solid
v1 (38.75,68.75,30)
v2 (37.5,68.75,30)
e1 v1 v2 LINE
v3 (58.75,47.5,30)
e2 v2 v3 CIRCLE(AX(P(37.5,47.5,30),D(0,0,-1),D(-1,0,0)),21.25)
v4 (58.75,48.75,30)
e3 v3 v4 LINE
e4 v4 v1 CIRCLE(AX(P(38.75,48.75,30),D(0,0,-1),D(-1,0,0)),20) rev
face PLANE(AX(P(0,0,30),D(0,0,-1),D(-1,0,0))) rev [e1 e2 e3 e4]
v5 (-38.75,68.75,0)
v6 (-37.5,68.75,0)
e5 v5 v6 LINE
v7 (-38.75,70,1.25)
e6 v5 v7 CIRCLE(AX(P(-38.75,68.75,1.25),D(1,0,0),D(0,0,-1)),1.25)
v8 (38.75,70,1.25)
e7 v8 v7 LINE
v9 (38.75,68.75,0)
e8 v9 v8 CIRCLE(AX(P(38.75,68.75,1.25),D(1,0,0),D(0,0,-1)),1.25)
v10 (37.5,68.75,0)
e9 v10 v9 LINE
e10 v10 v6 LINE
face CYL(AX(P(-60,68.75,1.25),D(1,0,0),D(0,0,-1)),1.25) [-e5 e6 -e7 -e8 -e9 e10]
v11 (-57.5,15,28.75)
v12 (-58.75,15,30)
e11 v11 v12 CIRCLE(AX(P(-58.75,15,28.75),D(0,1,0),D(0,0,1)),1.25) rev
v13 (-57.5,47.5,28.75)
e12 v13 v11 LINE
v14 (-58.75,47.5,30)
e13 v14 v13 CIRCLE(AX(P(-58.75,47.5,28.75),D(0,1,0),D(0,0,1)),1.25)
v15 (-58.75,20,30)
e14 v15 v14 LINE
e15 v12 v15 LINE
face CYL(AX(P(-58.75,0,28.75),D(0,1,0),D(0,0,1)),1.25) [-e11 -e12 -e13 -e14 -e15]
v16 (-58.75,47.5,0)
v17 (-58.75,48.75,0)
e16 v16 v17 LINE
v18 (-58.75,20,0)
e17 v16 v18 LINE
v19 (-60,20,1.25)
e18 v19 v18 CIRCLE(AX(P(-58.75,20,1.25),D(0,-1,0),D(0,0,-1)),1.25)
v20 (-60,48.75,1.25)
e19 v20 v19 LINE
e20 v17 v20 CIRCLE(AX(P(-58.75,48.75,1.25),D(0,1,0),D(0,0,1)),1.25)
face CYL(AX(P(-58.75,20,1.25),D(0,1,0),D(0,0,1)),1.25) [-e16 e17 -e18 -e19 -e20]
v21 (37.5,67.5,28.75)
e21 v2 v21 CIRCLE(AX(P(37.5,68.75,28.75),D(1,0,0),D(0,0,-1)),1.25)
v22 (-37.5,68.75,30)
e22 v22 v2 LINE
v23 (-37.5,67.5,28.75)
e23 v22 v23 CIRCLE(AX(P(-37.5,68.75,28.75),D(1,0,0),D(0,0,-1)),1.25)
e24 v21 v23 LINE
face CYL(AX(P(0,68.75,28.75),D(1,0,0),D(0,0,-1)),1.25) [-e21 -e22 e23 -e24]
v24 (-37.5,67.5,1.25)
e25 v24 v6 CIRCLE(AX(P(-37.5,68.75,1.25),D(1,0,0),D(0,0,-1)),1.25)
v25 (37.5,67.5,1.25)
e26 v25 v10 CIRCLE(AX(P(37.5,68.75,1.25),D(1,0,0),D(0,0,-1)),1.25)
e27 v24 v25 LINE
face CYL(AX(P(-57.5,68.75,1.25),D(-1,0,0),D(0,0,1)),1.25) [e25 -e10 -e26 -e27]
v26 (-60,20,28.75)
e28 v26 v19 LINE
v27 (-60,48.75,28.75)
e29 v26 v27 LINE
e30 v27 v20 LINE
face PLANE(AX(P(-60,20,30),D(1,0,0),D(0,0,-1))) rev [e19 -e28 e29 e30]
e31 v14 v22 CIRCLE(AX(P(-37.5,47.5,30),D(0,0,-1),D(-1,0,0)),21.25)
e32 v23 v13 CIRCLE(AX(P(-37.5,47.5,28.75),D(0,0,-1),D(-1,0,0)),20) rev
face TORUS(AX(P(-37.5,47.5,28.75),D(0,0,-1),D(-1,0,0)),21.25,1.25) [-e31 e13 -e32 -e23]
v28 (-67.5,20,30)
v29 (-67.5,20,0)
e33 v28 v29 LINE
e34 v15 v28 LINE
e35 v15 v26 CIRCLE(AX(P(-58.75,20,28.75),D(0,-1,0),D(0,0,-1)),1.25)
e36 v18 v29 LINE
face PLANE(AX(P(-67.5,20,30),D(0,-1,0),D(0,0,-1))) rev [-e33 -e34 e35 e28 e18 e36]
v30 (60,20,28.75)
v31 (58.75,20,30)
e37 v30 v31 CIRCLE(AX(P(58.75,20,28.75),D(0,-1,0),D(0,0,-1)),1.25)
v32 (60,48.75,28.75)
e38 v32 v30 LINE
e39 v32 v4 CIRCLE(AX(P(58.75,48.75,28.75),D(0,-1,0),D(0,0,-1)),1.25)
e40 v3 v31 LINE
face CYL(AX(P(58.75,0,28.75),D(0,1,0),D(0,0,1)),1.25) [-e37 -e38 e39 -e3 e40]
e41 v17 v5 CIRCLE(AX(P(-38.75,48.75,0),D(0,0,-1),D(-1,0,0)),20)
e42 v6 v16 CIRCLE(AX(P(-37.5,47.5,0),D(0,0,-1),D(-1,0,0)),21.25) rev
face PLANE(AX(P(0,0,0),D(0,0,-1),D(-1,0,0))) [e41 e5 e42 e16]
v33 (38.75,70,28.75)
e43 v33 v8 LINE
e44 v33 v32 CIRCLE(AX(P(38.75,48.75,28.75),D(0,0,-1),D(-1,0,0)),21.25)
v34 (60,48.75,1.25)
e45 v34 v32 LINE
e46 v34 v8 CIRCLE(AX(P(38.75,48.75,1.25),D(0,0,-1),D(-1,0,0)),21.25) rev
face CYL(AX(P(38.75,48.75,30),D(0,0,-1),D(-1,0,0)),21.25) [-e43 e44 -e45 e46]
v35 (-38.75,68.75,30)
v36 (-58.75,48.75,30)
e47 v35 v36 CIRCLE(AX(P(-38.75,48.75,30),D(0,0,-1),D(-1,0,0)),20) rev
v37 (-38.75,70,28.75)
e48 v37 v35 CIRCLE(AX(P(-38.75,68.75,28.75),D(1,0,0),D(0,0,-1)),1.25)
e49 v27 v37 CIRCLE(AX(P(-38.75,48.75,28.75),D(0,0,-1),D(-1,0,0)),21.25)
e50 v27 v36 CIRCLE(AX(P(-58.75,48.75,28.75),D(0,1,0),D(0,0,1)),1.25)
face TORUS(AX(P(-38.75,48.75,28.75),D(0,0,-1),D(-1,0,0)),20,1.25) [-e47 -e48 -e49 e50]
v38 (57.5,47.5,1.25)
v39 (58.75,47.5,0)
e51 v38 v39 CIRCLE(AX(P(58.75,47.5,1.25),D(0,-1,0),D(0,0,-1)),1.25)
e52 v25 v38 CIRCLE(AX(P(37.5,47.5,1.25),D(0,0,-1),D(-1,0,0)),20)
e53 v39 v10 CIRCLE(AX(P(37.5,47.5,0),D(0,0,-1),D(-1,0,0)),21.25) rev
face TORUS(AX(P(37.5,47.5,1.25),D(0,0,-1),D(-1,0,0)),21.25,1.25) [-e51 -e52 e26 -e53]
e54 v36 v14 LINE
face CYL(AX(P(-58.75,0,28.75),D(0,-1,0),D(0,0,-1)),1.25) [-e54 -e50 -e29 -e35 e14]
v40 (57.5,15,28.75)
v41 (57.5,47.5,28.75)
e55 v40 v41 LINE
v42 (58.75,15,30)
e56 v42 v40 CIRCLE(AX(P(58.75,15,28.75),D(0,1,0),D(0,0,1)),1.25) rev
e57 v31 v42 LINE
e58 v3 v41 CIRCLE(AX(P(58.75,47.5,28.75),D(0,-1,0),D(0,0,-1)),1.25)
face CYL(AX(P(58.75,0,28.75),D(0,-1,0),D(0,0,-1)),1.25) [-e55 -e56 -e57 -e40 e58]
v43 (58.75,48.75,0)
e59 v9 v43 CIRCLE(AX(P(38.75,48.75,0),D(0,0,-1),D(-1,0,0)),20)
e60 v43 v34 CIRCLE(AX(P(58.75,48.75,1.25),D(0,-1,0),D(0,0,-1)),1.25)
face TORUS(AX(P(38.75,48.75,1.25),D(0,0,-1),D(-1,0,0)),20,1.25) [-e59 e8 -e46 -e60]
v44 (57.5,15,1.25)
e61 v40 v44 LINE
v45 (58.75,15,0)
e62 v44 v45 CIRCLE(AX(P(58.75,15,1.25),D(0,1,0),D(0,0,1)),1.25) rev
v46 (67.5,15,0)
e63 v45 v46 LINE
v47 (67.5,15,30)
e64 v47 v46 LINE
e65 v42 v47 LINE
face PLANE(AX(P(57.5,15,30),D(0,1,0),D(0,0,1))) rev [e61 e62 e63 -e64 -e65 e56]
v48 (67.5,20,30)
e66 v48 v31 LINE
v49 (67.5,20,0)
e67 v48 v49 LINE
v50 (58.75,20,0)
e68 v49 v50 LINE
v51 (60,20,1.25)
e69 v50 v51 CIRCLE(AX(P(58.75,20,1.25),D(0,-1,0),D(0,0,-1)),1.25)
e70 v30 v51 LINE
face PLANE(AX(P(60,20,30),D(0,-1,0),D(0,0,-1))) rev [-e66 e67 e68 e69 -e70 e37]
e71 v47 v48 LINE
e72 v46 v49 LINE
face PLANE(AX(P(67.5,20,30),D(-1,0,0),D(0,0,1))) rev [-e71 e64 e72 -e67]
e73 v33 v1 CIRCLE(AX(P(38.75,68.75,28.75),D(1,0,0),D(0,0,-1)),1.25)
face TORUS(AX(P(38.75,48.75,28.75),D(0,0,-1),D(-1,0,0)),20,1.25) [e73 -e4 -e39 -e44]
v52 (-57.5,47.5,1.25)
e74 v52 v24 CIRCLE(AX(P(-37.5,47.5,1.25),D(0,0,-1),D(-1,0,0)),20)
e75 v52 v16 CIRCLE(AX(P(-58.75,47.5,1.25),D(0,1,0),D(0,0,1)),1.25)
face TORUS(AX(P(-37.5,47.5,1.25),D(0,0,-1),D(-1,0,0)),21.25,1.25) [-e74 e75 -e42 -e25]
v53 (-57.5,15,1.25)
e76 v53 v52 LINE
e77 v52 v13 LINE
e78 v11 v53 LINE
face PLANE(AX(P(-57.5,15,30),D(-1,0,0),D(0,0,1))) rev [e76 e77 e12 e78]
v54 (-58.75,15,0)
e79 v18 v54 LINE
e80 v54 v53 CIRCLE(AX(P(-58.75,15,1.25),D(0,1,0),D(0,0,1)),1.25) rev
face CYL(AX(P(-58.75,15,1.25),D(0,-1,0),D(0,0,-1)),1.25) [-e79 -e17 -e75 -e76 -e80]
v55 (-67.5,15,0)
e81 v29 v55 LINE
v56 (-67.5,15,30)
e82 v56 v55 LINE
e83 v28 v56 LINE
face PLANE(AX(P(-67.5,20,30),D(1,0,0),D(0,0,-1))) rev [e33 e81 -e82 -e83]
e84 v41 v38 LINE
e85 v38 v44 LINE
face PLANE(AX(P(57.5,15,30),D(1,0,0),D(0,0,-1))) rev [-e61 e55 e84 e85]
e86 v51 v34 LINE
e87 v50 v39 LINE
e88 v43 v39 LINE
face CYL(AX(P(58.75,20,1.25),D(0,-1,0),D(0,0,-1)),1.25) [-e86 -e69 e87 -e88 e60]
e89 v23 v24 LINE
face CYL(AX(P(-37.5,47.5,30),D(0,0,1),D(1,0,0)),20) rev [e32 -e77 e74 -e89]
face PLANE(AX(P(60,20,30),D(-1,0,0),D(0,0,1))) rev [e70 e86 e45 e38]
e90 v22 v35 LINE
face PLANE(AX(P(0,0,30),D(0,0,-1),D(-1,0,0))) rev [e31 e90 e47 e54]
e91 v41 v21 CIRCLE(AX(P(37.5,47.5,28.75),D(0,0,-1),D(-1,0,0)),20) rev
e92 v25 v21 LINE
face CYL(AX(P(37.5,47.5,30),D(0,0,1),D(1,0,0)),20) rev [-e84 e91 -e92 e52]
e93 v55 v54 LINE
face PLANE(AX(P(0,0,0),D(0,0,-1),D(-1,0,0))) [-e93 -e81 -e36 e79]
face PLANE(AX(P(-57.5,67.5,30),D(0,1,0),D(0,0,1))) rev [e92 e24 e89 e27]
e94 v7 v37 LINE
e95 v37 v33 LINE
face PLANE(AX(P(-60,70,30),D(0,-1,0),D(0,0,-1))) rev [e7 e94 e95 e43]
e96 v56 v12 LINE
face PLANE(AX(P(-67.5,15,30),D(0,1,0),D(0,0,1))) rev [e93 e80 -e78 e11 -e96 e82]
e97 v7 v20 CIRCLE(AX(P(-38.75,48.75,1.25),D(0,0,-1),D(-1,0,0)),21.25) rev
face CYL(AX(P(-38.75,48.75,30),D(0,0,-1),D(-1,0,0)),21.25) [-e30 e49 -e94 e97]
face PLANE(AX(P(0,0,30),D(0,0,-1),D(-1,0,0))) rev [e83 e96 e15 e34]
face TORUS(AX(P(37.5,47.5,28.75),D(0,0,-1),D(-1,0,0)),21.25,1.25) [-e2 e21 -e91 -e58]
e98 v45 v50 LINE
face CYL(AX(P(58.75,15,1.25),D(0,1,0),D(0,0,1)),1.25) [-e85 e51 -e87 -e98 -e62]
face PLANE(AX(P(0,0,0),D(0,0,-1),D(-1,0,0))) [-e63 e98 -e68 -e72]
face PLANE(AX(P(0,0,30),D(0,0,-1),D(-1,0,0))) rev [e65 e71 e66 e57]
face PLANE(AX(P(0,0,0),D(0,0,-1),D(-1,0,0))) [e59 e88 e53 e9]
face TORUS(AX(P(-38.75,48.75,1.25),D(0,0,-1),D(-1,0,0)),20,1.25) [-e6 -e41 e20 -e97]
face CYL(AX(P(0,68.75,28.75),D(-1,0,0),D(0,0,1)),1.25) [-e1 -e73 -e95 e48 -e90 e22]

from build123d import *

# Parameters (mm, degrees)
BOSS_EXTRUDE1_DEPTH = 30
FILLET3_R           = 20
FILLET4_R           = 21.25
FILLET5_R           = 1.25


with BuildPart() as part:
    # Sketch1 → Boss-Extrude1 (new body)
    with BuildSketch(Plane.XY):
        Polygon((-67.5, 15), (-57.5, 15), (-57.5, 67.5), (57.5, 67.5), (57.5, 15), (67.5, 15), (67.5, 20), (60, 20), (60, 70), (-60, 70), (-60, 20), (-67.5, 20), align=None)
    extrude(amount=BOSS_EXTRUDE1_DEPTH)

    # Fillet3
    fillet3_edges = [part.edges().sort_by_distance(p)[0] for p in [
        (57.5, 67.5, 15),
        (-57.5, 67.5, 15),
    ]]
    fillet(fillet3_edges, radius=FILLET3_R)

    # Fillet4
    fillet4_edges = [part.edges().sort_by_distance(p)[0] for p in [
        (-60, 70, 15),
        (60, 70, 15),
    ]]
    fillet(fillet4_edges, radius=FILLET4_R)

    # Fillet5
    fillet5_edges = [part.edges().sort_by_distance(p)[0] for p in [
        (-57.5, 31.25, 0),
        (60, 34.375, 0),
        (60, 34.375, 30),
        (57.5, 31.25, 0),
        (57.5, 31.25, 30),
        (0, 67.5, 0),
        (0, 67.5, 30),
        (51.642135624, 61.642135624, 0),
        (51.642135624, 61.642135624, 30),
        (-51.642135624, 61.642135624, 0),
        (-51.642135624, 61.642135624, 30),
        (-57.5, 31.25, 30),
        (0, 70, 0),
        (0, 70, 30),
        (-60, 34.375, 0),
        (-53.7760191, 63.7760191, 0),
        (53.7760191, 63.7760191, 0),
        (-60, 34.375, 30),
        (-53.7760191, 63.7760191, 30),
        (53.7760191, 63.7760191, 30),
    ]]
    fillet(fillet5_edges, radius=FILLET5_R - 0.0001)  # a hair under: the kernel refuses the full size


solid = part.part
